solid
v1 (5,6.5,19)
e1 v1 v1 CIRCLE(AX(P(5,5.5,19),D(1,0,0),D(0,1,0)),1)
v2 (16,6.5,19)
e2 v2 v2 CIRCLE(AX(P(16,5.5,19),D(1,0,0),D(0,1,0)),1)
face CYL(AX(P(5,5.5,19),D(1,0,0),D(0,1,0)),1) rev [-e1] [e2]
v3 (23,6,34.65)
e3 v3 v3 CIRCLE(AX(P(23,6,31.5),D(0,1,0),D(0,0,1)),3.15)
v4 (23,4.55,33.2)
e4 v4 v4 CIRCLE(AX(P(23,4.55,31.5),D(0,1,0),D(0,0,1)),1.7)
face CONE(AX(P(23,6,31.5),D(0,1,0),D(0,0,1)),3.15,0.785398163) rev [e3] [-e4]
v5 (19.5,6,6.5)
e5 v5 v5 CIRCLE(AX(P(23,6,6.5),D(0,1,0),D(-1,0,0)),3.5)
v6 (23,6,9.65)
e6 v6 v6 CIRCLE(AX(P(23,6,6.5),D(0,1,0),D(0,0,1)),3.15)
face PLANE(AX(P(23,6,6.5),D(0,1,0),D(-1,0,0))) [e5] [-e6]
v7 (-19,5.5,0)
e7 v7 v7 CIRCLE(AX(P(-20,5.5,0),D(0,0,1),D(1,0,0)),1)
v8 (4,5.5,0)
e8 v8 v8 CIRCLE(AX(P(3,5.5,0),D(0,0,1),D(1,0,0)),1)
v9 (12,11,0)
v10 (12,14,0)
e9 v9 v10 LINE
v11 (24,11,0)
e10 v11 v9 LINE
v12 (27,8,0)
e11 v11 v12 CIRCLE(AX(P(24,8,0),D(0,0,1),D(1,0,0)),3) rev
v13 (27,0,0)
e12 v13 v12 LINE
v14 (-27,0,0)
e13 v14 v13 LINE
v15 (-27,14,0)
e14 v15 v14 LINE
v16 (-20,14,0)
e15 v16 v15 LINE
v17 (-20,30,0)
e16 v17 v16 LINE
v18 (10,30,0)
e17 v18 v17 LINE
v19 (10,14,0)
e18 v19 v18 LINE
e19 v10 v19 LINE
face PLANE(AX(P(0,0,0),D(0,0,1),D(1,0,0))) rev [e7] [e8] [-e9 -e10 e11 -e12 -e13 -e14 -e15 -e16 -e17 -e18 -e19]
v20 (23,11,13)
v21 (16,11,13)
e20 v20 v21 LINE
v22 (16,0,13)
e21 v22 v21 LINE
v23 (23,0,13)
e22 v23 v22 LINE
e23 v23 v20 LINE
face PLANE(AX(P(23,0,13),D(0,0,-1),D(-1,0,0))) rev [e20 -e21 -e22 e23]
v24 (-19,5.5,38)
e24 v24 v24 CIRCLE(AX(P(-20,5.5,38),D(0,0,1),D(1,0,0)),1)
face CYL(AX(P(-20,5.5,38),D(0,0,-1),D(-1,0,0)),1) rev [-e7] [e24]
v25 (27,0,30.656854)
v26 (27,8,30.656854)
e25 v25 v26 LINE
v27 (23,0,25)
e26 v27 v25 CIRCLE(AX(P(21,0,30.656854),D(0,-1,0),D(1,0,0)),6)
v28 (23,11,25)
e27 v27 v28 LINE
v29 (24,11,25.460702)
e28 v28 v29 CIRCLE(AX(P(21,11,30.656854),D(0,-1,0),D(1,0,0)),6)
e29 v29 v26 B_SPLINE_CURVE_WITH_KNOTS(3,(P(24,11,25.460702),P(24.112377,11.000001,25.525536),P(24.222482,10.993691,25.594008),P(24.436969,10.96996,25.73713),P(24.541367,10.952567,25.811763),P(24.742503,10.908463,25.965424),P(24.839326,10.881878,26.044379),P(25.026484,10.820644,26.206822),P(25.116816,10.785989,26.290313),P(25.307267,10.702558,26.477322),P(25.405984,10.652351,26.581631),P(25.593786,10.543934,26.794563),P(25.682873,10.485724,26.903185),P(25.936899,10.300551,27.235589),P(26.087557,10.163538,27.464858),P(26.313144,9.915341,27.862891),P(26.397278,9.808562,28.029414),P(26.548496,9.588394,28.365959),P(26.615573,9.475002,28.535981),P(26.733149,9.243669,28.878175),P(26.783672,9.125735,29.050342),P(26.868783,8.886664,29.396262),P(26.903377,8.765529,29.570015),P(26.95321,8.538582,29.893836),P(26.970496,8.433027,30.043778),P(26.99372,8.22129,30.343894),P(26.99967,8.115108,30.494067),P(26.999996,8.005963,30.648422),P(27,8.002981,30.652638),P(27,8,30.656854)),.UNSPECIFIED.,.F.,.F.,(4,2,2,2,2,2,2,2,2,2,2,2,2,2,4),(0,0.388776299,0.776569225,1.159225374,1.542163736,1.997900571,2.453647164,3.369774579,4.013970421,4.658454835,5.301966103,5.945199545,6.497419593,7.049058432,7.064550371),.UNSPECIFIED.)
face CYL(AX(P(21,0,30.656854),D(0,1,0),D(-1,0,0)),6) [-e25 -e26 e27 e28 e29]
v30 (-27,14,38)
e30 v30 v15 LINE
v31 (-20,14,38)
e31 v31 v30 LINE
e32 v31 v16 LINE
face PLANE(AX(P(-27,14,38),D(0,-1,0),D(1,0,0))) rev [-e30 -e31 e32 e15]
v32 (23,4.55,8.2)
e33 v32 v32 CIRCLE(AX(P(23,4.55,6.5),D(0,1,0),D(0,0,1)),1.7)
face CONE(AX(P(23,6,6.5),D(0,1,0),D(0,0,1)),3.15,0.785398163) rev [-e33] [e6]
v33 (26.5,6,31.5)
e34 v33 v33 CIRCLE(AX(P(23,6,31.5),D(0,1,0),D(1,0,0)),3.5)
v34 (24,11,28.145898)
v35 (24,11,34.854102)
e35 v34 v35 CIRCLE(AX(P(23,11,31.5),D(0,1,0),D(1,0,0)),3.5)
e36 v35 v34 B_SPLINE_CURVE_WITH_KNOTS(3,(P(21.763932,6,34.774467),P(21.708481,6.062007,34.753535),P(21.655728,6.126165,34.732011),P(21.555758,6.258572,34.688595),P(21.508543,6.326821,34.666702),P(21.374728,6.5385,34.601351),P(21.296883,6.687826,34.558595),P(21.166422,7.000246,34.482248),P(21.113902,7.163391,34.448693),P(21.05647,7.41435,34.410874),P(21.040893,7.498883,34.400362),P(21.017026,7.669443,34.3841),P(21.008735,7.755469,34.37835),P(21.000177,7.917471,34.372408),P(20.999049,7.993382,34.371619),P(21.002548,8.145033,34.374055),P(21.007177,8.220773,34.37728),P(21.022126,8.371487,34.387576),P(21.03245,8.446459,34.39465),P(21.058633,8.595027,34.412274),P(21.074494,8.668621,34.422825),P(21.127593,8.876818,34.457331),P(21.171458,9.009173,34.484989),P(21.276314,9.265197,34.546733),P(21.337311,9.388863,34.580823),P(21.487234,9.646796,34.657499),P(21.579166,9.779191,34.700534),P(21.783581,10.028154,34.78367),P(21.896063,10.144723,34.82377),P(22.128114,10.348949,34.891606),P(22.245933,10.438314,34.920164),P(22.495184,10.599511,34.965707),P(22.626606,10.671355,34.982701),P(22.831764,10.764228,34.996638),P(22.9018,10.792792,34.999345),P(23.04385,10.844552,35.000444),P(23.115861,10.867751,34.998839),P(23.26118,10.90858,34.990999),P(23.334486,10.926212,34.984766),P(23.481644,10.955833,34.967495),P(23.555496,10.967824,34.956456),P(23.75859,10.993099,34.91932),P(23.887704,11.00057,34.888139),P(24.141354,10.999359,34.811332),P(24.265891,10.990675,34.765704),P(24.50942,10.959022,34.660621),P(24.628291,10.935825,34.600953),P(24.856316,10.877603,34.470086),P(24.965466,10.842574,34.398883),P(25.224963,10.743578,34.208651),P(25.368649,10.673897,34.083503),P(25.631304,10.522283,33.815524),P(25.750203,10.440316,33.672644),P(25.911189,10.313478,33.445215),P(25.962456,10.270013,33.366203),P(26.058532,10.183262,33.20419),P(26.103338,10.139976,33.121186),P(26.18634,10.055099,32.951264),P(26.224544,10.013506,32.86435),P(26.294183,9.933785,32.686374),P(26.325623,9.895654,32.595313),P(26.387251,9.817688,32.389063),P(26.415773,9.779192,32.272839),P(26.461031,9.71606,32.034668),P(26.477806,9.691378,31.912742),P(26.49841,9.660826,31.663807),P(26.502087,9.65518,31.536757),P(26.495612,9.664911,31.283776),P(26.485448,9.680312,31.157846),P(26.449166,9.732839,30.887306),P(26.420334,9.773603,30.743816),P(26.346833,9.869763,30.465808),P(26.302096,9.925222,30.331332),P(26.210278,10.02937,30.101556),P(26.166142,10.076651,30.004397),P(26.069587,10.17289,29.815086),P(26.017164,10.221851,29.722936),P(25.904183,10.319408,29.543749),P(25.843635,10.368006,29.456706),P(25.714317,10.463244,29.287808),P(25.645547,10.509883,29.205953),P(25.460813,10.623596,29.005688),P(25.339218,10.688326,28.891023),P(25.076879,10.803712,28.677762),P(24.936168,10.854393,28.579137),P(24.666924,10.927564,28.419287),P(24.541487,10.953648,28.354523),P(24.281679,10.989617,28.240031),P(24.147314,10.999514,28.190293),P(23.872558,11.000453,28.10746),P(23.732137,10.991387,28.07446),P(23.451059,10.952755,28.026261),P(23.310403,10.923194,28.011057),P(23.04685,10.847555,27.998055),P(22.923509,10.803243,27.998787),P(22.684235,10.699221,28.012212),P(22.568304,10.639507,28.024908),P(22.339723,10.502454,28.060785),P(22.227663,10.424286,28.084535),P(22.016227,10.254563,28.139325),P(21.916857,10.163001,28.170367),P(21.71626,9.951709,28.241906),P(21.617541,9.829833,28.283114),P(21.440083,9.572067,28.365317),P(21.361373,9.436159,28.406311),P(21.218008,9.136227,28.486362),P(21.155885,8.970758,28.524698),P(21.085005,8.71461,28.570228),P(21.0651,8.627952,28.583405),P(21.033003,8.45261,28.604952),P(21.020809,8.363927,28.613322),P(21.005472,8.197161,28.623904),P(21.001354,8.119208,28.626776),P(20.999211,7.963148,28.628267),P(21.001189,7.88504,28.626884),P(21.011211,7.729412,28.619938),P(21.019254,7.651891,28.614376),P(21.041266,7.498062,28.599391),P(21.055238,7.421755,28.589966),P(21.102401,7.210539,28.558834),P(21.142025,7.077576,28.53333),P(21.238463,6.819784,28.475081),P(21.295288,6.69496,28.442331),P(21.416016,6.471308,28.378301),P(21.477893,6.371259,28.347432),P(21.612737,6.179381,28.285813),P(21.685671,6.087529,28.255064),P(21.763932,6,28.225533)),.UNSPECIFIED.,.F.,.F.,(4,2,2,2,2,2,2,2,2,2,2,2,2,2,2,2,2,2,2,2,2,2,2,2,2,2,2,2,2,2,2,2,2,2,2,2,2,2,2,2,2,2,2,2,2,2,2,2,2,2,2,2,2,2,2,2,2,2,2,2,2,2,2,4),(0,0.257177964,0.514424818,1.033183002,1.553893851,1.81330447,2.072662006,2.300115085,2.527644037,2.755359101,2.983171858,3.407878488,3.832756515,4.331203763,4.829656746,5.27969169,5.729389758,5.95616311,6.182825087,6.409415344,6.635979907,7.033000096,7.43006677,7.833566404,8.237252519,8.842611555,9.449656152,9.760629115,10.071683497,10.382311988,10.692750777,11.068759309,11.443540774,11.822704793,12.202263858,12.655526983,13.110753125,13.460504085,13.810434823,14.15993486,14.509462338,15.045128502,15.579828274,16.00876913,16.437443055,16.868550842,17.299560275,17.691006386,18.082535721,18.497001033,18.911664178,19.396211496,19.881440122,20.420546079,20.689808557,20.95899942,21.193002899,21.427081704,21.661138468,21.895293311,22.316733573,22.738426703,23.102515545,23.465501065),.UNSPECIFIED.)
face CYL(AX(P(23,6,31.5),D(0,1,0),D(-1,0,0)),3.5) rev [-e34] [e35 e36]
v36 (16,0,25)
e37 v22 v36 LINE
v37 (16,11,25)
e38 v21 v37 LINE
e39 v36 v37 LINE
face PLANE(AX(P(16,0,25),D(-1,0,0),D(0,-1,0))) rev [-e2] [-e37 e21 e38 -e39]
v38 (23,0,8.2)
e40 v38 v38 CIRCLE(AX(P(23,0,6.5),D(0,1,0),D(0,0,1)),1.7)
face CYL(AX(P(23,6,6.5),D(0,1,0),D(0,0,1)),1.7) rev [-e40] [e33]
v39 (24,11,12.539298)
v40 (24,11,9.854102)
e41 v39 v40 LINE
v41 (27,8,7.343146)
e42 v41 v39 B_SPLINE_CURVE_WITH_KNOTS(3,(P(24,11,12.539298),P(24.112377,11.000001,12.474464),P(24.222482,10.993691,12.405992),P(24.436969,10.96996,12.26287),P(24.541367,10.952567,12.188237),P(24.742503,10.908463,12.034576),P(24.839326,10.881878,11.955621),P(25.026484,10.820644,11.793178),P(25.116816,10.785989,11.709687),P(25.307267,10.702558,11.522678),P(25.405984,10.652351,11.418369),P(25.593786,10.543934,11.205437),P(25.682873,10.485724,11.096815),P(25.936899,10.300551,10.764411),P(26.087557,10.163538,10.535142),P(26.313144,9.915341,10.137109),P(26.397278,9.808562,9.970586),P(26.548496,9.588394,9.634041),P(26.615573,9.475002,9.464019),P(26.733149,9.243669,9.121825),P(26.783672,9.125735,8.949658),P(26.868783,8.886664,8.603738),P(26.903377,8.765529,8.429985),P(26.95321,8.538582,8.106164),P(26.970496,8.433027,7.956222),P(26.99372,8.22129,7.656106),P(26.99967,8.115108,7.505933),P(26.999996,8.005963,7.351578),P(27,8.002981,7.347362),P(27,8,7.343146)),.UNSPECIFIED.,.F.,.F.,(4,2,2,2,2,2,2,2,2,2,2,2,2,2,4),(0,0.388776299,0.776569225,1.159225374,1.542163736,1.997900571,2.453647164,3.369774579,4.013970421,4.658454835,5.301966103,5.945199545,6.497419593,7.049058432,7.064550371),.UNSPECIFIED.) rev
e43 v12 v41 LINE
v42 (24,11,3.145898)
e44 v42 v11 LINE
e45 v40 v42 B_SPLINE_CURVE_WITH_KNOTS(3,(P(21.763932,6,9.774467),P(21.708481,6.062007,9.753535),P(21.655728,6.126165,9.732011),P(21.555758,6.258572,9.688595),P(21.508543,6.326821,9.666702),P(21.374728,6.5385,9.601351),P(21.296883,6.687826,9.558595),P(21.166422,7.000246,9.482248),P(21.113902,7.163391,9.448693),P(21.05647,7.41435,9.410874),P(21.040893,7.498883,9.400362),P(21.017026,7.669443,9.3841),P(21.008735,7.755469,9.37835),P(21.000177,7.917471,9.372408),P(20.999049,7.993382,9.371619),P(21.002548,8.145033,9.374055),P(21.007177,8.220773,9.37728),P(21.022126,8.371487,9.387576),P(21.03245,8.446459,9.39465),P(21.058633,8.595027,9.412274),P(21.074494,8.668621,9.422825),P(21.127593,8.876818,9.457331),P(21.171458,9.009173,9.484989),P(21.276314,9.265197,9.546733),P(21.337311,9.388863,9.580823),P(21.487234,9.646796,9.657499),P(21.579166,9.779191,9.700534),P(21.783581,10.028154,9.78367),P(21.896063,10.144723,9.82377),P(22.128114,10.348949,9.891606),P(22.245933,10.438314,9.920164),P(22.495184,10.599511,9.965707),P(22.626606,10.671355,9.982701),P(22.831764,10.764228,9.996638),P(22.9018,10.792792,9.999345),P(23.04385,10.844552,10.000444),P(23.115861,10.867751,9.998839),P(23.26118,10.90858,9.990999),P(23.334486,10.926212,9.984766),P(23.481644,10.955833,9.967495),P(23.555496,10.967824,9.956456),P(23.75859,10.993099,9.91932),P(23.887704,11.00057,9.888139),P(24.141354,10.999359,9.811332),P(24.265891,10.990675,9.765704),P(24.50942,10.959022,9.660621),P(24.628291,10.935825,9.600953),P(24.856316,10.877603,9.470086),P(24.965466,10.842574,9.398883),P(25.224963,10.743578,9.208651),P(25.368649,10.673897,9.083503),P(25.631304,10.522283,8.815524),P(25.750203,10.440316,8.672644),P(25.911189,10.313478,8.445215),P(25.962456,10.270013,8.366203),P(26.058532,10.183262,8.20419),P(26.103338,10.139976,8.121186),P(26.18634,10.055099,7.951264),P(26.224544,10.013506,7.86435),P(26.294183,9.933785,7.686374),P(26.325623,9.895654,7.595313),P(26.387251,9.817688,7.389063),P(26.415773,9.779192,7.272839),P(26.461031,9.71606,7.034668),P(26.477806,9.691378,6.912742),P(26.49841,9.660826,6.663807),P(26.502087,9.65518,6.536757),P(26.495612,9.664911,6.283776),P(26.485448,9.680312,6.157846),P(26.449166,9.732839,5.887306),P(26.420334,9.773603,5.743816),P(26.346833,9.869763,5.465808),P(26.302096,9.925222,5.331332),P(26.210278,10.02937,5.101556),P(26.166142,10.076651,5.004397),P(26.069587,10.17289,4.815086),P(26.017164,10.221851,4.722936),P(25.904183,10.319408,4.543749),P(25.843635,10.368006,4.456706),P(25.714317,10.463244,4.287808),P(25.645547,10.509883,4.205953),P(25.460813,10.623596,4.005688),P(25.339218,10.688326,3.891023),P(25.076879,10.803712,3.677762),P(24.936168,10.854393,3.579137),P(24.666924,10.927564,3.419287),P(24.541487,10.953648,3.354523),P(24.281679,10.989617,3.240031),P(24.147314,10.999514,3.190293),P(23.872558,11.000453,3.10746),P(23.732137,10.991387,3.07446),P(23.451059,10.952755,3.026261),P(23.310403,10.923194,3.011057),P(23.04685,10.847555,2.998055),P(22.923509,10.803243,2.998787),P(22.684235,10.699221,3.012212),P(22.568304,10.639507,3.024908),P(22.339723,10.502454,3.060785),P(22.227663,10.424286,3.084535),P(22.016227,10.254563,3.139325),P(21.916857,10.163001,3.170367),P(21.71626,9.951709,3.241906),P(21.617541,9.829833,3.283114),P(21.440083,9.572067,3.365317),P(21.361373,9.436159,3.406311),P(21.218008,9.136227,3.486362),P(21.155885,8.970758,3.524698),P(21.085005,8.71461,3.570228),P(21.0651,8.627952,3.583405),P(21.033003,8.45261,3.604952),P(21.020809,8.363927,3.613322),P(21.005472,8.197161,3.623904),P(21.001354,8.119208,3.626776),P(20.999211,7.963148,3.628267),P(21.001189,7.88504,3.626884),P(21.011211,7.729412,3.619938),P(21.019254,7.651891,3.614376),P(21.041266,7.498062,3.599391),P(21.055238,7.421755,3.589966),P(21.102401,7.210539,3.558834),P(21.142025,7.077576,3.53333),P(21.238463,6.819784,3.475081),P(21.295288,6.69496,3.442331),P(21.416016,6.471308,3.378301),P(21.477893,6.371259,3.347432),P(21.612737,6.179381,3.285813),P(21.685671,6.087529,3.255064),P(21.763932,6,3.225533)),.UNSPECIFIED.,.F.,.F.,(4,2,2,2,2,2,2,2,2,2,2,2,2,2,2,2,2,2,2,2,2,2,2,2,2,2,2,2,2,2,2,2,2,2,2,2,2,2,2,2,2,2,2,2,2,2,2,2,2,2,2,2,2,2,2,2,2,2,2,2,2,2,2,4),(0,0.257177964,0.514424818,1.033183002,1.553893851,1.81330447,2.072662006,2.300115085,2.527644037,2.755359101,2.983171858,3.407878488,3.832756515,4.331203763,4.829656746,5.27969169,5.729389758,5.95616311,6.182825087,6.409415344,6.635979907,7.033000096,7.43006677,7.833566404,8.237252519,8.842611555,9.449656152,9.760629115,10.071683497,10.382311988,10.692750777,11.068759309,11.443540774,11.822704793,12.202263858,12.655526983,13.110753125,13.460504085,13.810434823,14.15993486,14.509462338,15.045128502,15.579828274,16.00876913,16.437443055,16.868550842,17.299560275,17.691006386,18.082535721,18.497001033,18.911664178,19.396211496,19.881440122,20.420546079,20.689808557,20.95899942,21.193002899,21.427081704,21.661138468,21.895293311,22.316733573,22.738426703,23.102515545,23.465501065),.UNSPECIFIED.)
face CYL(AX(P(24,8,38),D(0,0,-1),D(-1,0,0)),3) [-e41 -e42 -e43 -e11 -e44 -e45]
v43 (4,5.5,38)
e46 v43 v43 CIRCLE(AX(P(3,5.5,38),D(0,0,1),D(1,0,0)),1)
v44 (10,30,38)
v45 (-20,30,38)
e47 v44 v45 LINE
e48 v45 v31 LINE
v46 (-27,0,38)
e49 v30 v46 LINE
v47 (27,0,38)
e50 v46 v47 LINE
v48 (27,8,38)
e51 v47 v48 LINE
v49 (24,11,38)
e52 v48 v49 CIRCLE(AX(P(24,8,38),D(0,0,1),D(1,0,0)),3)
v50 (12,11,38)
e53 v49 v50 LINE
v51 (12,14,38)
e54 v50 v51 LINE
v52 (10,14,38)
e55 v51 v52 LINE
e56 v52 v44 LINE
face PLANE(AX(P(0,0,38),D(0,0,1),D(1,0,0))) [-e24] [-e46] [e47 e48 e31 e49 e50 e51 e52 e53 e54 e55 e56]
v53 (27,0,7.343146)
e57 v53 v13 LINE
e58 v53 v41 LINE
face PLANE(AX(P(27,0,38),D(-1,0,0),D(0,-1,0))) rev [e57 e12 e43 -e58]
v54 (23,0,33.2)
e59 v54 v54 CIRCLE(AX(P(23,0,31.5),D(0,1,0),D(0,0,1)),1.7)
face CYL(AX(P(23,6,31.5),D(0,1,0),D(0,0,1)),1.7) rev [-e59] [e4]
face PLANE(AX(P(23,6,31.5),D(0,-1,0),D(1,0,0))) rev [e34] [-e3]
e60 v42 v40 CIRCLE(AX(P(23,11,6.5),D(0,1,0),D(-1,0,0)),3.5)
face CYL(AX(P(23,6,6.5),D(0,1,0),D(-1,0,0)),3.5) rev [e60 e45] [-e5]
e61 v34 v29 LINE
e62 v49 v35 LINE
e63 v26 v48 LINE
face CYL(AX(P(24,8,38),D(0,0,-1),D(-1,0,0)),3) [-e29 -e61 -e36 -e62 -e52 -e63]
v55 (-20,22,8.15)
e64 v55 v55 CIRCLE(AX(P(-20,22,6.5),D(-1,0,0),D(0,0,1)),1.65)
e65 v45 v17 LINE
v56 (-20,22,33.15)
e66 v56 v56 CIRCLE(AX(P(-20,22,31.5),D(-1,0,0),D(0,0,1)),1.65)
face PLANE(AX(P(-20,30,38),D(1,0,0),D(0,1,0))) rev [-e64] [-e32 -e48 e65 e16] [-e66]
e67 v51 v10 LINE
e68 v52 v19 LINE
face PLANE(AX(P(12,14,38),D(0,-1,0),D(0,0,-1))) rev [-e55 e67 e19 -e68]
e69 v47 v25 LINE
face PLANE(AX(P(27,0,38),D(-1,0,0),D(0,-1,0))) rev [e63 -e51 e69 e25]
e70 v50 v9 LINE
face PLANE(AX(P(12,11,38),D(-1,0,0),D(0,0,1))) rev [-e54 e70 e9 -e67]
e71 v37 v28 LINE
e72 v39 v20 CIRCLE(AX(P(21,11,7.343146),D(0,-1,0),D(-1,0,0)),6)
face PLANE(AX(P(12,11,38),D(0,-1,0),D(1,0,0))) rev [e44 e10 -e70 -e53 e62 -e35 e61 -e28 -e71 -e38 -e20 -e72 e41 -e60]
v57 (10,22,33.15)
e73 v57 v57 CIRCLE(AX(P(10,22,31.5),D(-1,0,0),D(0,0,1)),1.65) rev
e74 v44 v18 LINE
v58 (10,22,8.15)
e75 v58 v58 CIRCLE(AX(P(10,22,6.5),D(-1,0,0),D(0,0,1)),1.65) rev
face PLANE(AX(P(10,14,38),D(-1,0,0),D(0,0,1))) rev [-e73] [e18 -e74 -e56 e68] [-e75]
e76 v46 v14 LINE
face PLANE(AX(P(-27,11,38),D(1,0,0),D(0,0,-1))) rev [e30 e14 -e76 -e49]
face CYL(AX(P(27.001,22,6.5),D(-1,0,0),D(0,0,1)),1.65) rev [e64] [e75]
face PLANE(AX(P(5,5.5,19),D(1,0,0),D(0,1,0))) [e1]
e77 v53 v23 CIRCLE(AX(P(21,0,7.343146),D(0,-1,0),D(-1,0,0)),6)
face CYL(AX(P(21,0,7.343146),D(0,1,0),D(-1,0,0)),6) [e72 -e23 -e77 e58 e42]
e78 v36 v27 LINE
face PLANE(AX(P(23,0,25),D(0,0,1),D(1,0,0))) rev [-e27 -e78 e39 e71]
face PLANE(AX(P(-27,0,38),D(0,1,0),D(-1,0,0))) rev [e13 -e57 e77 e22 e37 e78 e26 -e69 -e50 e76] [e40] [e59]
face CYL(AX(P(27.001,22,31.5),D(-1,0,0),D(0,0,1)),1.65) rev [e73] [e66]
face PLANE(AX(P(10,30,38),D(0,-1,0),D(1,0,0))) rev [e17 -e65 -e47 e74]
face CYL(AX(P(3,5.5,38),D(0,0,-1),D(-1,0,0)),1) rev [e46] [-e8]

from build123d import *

# Parameters (mm, degrees)
SKETCH_28_R                  = 1
EXTRUDE_4469_DEPTH           = 38
CUT_EXTRUDE_4687_REACH       = 69.476
SKETCH_29_R                  = 1.65
CUT_EXTRUDE_4925_DEPTH       = 51.338851795
FILLET_9_R                   = 3
SKETCH_31_R                  = 1
CUT_EXTRUDE_5310_DEPTH       = 11
SKETCH_32_R                  = 3.5
CUT_EXTRUDE_5556_DEPTH       = 5
HOLE_WIZARD_5601_D           = 3.4
HOLE_WIZARD_5601_CSINK_D     = 6.3
HOLE_WIZARD_5601_CSINK_ANGLE = 90


with BuildPart() as part:
    # Эскиз28 → Extrude 4469 (new body)
    with BuildSketch(Plane.XY):
        Polygon((27, 0), (27, 11), (12, 11), (12, 14), (10, 14), (10, 30), (-20, 30), (-20, 14), (-27, 14), (-27, 11), (-27, 0), align=None)
        with Locations((3, 5.5)):
            Circle(SKETCH_28_R, mode=Mode.SUBTRACT)
        with Locations((-20, 5.5)):
            Circle(SKETCH_28_R, mode=Mode.SUBTRACT)
    extrude(amount=EXTRUDE_4469_DEPTH)

    # Эскиз29 → Cut-Extrude 4687 (cut, up to next)
    with BuildSketch(Plane.ZY.offset(20), mode=Mode.PRIVATE) as cut_extrude_4687_sk1:
        with Locations((6.5, 22)):
            Circle(SKETCH_29_R)
    cut_extrude_4687_tool1 = extrude(cut_extrude_4687_sk1.sketch, amount=-CUT_EXTRUDE_4687_REACH, mode=Mode.PRIVATE) & part.part
    # Эскиз29 → Cut-Extrude 4687 (cut, up to next)
    with BuildSketch(Plane.ZY.offset(20), mode=Mode.PRIVATE) as cut_extrude_4687_sk2:
        with Locations((31.5, 22)):
            Circle(SKETCH_29_R)
    cut_extrude_4687_tool2 = extrude(cut_extrude_4687_sk2.sketch, amount=-CUT_EXTRUDE_4687_REACH, mode=Mode.PRIVATE) & part.part
    add(cut_extrude_4687_tool1.solids().sort_by_distance((-20, 22, 6.5))[0], mode=Mode.SUBTRACT)
    add(cut_extrude_4687_tool2.solids().sort_by_distance((-20, 22, 31.5))[0], mode=Mode.SUBTRACT)

    # Эскиз30 → Cut-Extrude 4925 (cut, through all)
    with BuildSketch(Plane(origin=(0, 11, 0), x_dir=(1, 0, 0), z_dir=(0, 1, 0))):
        with BuildLine():
            Line((23, -13), (16, -13))
            Line((16, -13), (16, -25))
            Line((16, -25), (23, -25))
            ThreePointArc((23, -25), (25.898979486, -27.192752634), (27, -30.656854249))
            Line((27, -30.656854249), (27, -7.343145751))
            ThreePointArc((27, -7.343145751), (25.898979486, -10.807247366), (23, -13))
        make_face()
    extrude(amount=-CUT_EXTRUDE_4925_DEPTH, mode=Mode.SUBTRACT)

    # Скругление9
    # the kernel refuses this fillet: 3 mm, written as the material it takes off along each edge
    with BuildSketch(Plane(origin=(27, 11, 23.156854249), x_dir=(-1, 0, 0), z_dir=(0, 0, 1))) as fillet_9_piece_1:
        with BuildLine():
            CenterArc((FILLET_9_R, FILLET_9_R), FILLET_9_R, 180, 90)
            Line((0, FILLET_9_R), (0, 0))
            Line((0, 0), (FILLET_9_R, 0))
        make_face()
    extrude(amount=22.343145751, mode=Mode.SUBTRACT)
    with BuildSketch(Plane(origin=(27, 11, -7.5), x_dir=(0, -1, 0), z_dir=(0, 0, 1))) as fillet_9_piece_2:
        with BuildLine():
            CenterArc((FILLET_9_R, -FILLET_9_R), FILLET_9_R, 90, 90)
            Line((0, -FILLET_9_R), (0, 0))
            Line((0, 0), (FILLET_9_R, 0))
        make_face()
    extrude(amount=22.343145751, mode=Mode.SUBTRACT)

    # Эскиз31 → Cut-Extrude 5310 (cut)
    with BuildSketch(Plane(origin=(16, 0, 0), x_dir=(0, 0, -1), z_dir=(1, 0, 0))):
        with Locations(Location((-19, 5.5, 0), (0, 0, 90))):
            Circle(SKETCH_31_R)
    extrude(amount=-CUT_EXTRUDE_5310_DEPTH, mode=Mode.SUBTRACT)

    # Эскиз32 → Cut-Extrude 5556 (cut)
    with BuildSketch(Plane(origin=(0, 11, 0), x_dir=(1, 0, 0), z_dir=(0, 1, 0))):
        with Locations(Location((23, -6.5, 0), (0, 0, 180))):
            Circle(SKETCH_32_R)
        with Locations(Location((23, -31.5, 0), (0, 0, 73.398450401))):
            Circle(SKETCH_32_R)
    extrude(amount=-CUT_EXTRUDE_5556_DEPTH, mode=Mode.SUBTRACT)

    # Hole Wizard 5601 (through all)
    with Locations(Plane(origin=(0, 6, 0), x_dir=(1, 0, 0), z_dir=(0, 1, 0))):
        with Locations((23, -6.5), (23, -31.5)):
            CounterSinkHole(HOLE_WIZARD_5601_D / 2, HOLE_WIZARD_5601_CSINK_D / 2, counter_sink_angle=HOLE_WIZARD_5601_CSINK_ANGLE)


solid = part.part
